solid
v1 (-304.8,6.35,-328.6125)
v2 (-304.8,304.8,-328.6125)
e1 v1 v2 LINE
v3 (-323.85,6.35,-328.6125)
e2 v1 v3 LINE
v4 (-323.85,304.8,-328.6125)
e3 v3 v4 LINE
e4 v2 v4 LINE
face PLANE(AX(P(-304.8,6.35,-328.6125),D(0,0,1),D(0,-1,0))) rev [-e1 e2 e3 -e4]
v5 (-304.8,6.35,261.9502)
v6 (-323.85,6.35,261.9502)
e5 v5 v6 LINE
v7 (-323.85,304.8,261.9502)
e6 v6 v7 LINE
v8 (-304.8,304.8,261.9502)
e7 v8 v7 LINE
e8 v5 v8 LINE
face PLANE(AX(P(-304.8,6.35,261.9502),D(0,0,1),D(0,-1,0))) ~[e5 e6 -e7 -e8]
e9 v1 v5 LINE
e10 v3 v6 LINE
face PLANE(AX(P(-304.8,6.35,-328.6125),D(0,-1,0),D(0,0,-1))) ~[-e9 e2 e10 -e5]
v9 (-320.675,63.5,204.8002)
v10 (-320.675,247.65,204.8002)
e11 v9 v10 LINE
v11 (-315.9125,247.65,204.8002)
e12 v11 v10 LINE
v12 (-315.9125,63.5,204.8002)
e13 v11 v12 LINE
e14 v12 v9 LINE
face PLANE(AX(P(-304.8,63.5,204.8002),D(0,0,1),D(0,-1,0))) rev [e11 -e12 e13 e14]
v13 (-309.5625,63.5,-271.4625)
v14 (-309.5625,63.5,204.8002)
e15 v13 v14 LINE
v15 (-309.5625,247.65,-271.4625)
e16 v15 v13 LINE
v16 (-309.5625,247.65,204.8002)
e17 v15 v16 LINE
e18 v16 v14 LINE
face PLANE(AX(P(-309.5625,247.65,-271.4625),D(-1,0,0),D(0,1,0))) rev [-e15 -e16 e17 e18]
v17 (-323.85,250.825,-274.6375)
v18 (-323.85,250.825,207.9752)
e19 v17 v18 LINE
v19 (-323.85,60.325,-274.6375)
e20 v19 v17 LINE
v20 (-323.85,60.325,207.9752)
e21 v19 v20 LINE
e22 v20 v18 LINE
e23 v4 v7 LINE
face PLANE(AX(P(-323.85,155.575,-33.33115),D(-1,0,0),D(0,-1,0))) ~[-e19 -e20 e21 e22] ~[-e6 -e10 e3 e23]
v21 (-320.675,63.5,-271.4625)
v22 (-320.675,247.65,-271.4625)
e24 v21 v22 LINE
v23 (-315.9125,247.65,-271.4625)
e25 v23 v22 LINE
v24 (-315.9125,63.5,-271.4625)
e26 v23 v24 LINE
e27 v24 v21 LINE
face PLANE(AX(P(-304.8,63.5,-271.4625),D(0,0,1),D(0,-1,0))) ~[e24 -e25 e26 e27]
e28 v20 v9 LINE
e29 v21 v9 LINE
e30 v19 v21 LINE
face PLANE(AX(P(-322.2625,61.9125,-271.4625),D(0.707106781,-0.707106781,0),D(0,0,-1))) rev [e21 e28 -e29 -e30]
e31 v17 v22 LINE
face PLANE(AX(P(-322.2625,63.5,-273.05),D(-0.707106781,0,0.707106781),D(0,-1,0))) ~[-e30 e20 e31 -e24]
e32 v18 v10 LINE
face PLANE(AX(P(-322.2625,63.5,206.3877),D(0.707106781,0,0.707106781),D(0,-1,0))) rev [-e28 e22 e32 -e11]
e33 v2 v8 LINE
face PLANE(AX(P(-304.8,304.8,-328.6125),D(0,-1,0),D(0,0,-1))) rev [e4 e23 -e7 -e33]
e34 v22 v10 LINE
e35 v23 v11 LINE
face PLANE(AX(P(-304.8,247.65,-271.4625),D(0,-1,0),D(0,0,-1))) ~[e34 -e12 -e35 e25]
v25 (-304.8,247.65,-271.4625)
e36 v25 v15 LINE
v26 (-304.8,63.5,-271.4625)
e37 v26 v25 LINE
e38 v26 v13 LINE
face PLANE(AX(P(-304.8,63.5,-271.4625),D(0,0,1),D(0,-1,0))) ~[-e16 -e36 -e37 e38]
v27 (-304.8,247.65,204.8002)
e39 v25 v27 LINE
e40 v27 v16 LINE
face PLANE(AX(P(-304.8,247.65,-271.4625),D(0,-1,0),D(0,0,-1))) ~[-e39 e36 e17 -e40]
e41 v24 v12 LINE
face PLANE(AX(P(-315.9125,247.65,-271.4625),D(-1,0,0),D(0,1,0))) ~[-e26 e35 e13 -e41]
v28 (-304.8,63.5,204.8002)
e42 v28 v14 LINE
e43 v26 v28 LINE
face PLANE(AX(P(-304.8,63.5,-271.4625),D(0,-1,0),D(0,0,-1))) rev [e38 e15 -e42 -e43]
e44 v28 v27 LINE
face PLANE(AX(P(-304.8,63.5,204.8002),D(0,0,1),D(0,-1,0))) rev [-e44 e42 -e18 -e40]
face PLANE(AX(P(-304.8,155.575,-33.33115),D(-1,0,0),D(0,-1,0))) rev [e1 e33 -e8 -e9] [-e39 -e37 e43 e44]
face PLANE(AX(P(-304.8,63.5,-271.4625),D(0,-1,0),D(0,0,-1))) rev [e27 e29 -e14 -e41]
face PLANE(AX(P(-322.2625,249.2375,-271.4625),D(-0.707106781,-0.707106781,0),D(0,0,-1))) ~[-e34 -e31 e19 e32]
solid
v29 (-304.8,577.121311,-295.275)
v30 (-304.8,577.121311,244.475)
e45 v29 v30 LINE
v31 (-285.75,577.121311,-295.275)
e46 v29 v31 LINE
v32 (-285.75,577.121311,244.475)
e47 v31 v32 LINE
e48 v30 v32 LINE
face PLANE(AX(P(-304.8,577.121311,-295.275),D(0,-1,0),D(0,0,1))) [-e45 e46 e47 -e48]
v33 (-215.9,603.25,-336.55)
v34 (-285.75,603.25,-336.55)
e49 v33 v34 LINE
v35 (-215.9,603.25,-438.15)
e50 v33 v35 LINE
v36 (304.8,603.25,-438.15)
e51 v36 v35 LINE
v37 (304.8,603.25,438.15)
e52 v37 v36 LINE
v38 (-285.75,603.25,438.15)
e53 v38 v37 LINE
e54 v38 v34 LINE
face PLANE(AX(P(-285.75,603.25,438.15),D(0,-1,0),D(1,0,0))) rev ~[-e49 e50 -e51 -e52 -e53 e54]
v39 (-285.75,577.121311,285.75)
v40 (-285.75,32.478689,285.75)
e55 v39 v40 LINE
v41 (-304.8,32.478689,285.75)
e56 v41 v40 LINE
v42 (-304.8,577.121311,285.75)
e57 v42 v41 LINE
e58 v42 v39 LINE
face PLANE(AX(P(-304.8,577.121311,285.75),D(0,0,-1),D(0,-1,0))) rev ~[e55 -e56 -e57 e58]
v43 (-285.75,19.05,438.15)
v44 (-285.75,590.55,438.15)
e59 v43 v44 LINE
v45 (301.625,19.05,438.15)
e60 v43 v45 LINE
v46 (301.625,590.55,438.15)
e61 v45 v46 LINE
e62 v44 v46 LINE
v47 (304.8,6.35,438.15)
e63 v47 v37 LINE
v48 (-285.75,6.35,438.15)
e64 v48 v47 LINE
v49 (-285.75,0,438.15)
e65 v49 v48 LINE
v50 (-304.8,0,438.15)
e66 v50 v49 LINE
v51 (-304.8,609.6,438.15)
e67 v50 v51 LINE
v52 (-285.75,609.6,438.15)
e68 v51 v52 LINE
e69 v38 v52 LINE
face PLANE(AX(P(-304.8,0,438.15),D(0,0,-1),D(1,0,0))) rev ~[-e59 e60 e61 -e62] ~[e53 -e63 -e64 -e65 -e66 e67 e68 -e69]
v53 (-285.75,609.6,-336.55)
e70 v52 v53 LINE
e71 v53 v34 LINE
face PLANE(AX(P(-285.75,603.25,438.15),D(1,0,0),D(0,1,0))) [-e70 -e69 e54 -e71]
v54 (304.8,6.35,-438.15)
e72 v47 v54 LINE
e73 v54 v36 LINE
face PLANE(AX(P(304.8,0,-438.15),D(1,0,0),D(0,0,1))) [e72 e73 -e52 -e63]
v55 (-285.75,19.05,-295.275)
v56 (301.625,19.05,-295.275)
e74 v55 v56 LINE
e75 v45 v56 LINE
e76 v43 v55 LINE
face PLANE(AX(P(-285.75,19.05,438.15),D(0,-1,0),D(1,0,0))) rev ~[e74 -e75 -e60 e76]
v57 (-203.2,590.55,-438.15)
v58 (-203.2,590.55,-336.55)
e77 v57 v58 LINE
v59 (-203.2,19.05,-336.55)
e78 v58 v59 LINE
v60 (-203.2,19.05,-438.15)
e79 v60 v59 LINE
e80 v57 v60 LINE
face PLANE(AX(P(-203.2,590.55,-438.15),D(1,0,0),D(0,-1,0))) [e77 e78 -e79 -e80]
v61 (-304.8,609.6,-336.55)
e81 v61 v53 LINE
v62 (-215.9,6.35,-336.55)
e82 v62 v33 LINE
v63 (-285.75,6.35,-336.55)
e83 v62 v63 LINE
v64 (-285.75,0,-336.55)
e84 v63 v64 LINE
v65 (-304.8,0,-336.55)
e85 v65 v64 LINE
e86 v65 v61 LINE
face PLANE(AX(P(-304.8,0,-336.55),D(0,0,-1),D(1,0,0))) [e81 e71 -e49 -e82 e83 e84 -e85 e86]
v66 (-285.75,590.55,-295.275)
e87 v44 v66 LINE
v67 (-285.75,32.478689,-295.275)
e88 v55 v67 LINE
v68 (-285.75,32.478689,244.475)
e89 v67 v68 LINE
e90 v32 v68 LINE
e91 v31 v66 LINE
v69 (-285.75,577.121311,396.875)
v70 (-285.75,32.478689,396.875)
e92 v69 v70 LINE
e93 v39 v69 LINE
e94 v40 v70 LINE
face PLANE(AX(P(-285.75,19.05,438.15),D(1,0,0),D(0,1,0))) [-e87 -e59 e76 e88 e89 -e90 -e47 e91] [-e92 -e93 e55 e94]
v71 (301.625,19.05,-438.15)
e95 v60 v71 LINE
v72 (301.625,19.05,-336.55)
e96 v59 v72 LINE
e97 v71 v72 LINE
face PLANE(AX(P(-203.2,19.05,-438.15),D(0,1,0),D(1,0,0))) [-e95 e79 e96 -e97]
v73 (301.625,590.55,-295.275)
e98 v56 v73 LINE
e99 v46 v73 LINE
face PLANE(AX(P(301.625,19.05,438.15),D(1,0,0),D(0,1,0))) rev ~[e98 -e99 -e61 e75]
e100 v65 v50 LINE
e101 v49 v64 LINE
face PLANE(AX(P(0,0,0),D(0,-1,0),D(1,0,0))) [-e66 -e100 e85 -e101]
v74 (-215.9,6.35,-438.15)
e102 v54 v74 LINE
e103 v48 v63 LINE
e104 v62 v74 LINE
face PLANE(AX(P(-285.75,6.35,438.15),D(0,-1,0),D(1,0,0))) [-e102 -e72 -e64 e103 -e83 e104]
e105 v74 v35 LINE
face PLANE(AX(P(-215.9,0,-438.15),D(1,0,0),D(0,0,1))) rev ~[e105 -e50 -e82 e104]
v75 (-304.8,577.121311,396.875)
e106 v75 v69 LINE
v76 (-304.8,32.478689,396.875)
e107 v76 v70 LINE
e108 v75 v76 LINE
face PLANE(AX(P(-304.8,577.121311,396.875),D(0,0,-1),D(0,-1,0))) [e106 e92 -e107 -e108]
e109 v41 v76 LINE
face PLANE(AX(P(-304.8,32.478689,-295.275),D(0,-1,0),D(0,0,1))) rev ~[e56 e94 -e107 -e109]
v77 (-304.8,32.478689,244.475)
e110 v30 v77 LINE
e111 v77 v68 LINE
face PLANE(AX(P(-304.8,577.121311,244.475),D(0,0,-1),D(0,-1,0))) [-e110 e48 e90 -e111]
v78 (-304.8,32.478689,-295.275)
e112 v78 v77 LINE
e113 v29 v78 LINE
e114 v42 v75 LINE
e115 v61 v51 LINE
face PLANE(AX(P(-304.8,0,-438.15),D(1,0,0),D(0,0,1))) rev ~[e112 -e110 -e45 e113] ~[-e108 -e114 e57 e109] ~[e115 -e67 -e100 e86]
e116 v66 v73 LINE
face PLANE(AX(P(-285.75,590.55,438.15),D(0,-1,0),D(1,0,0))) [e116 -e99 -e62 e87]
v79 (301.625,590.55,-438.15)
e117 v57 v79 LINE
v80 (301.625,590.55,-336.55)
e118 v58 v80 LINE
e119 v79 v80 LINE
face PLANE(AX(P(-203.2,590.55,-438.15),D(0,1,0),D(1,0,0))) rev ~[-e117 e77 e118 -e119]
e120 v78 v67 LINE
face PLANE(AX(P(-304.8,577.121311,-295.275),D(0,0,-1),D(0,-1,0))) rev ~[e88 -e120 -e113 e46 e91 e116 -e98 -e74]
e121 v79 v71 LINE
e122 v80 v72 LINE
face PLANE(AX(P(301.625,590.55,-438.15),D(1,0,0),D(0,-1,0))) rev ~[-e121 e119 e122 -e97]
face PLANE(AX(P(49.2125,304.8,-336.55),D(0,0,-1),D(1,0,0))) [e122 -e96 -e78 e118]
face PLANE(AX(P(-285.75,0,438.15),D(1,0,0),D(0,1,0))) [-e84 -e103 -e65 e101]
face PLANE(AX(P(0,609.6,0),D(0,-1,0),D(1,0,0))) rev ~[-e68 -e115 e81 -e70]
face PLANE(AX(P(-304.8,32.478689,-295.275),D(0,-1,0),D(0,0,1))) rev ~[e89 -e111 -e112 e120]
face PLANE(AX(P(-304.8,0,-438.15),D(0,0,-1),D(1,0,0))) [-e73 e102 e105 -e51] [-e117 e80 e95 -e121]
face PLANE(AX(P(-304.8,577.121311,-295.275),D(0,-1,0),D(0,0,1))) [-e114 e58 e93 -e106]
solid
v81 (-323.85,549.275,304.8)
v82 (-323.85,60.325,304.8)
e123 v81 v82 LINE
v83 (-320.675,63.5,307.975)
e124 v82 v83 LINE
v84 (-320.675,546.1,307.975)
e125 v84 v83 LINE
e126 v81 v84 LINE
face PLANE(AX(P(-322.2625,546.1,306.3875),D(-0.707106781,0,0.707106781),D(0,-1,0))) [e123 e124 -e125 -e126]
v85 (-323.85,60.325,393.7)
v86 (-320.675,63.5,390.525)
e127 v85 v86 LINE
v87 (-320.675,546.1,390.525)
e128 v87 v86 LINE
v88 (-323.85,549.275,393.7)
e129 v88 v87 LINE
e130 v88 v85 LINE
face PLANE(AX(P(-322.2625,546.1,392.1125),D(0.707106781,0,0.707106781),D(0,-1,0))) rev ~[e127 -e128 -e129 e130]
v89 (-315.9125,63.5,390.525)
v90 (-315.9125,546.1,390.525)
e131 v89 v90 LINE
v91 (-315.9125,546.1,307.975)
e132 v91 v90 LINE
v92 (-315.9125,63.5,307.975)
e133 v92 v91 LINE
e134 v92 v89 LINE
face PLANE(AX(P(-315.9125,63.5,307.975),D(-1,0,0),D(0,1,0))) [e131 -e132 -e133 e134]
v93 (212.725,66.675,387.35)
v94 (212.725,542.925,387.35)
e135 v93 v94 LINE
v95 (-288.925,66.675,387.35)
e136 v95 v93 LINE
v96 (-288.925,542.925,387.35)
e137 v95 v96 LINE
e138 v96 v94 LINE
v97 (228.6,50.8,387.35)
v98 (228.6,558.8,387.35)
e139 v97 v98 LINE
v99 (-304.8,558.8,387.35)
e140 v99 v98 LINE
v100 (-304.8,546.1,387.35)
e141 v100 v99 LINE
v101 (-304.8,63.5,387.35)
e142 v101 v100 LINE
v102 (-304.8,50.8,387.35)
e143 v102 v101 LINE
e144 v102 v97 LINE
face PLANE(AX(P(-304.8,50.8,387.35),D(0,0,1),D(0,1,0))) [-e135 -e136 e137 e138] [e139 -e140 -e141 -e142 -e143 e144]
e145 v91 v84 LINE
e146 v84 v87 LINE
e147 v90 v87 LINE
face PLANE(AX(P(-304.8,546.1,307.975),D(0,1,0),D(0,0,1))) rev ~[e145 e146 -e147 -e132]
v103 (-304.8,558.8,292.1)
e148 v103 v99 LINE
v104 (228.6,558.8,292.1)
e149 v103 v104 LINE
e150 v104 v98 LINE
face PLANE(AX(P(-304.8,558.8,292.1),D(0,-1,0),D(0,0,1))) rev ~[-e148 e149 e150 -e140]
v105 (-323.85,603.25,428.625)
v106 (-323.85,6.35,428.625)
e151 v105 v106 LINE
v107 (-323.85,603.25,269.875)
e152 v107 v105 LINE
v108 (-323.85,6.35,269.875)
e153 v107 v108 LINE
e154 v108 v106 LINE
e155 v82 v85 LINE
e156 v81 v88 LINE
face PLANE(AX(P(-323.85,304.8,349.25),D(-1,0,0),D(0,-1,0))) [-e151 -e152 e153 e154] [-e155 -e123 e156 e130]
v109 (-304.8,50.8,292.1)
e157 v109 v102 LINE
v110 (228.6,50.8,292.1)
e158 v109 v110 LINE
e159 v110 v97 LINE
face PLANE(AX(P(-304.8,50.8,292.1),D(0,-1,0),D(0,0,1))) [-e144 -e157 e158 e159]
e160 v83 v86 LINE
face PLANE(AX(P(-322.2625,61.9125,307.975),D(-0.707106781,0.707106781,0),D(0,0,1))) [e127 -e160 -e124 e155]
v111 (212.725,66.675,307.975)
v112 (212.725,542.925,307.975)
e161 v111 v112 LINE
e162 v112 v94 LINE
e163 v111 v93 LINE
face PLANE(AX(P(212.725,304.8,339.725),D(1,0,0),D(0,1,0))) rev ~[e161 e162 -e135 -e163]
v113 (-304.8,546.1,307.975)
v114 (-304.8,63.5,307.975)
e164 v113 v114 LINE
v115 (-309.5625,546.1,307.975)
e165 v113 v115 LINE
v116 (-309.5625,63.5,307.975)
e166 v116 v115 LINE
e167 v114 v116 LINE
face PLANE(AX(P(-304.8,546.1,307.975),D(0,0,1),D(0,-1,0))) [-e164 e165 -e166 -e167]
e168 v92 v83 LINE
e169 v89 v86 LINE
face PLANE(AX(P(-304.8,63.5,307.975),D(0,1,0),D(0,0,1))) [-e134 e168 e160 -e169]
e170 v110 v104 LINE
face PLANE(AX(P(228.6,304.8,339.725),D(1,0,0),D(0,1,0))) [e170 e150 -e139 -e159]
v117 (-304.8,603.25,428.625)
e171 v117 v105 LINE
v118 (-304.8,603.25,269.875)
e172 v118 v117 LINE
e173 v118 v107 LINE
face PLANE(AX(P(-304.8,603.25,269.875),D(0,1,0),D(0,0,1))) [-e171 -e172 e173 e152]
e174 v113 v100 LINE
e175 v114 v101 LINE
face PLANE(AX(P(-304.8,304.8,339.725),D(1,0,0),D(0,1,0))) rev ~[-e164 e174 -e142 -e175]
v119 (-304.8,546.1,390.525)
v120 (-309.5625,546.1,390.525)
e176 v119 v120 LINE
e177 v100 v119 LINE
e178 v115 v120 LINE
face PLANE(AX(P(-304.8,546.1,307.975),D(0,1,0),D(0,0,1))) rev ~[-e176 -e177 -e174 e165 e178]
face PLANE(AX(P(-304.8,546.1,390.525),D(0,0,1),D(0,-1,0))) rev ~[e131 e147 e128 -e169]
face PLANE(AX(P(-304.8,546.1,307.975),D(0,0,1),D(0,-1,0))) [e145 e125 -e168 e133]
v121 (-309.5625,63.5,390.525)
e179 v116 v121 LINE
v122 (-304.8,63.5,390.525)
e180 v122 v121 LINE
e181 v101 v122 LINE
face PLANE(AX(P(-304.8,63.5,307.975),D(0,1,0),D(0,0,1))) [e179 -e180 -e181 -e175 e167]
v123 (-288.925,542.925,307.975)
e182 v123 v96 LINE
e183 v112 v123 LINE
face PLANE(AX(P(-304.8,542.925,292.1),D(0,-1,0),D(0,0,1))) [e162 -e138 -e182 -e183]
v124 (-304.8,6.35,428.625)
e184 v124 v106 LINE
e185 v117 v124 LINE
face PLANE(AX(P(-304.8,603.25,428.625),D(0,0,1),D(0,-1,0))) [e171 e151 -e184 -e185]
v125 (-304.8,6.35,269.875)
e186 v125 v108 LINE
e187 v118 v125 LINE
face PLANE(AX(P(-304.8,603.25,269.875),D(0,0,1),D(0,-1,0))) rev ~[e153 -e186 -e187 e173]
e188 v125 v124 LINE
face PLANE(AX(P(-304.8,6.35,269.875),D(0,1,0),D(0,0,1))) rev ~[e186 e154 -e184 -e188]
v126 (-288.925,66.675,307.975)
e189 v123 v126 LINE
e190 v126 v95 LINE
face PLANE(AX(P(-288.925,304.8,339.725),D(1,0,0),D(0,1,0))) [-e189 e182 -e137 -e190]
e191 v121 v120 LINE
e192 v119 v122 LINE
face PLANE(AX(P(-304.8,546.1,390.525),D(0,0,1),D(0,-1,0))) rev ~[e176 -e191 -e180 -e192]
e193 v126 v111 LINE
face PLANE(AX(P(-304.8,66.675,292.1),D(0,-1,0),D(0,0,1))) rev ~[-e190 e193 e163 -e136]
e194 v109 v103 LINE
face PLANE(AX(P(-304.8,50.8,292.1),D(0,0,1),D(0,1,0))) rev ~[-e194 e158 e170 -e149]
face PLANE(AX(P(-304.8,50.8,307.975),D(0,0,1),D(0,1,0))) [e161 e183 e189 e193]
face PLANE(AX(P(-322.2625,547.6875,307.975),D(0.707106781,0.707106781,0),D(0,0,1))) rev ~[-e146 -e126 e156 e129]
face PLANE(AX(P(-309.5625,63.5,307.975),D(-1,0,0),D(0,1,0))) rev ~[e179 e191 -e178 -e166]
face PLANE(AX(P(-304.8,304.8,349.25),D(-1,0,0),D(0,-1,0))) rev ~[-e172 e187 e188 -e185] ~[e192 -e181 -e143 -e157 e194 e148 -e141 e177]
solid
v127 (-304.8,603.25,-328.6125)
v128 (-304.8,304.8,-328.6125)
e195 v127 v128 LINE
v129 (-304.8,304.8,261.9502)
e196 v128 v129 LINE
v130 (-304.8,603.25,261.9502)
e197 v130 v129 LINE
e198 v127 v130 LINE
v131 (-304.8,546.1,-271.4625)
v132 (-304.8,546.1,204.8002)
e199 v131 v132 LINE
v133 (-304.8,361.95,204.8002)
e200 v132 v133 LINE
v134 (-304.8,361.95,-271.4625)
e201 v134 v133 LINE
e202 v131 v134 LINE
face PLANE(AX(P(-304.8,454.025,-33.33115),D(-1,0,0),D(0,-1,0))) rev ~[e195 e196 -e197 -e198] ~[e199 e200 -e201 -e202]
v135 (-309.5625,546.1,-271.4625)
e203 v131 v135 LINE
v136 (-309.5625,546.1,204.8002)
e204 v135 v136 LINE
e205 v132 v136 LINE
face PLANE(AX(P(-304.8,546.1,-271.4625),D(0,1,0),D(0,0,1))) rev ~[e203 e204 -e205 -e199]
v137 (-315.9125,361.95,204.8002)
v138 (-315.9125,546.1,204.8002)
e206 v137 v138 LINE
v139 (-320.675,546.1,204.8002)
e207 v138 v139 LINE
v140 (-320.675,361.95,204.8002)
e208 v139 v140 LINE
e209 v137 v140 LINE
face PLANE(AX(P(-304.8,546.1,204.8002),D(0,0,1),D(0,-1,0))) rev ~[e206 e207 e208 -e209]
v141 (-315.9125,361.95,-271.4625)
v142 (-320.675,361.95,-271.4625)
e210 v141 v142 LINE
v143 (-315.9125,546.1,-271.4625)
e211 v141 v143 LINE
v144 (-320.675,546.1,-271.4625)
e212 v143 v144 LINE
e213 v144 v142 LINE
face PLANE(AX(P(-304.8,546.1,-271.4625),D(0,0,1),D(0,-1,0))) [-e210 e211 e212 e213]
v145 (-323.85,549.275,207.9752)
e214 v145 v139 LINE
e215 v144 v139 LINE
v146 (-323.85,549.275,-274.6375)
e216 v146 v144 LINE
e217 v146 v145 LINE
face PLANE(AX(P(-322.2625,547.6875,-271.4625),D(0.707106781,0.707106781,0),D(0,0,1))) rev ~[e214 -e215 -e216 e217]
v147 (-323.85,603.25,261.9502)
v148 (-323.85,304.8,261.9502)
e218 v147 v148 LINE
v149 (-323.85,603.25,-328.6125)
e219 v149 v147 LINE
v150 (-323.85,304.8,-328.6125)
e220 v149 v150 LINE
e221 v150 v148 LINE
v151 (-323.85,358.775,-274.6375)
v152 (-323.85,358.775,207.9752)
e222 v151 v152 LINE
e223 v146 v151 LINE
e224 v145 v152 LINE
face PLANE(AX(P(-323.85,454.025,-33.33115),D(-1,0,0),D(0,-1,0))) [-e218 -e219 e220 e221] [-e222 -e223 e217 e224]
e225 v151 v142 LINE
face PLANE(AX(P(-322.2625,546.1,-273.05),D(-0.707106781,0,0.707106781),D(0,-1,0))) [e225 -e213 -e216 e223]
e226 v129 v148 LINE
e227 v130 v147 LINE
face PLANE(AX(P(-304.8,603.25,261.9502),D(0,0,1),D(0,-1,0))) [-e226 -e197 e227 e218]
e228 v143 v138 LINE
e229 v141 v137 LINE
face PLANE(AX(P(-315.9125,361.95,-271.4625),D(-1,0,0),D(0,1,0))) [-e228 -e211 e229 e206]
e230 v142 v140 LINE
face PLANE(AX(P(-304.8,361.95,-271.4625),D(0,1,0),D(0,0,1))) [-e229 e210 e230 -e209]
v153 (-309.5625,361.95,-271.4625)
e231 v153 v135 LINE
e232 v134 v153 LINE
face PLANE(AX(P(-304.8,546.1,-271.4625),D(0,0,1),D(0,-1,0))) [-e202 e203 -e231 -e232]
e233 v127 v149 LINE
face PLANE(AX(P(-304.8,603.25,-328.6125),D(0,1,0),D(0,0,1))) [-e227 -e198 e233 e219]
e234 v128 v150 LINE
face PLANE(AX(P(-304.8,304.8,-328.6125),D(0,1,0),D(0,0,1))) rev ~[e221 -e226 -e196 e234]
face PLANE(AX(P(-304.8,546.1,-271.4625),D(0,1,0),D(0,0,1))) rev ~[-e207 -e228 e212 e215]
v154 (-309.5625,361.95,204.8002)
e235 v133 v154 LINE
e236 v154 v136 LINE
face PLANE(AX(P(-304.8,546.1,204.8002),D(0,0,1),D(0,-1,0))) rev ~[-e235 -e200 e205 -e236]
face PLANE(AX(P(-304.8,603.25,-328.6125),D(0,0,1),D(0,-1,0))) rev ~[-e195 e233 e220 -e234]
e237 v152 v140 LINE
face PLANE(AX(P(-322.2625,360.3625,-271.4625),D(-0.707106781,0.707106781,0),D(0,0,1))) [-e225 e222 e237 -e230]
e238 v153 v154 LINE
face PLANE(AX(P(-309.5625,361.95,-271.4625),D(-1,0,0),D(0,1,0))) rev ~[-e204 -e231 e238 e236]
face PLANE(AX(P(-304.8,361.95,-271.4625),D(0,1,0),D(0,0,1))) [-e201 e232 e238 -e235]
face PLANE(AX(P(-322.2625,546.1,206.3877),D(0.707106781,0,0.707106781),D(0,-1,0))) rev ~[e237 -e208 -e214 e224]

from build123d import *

# Parameters (mm, degrees)
F0_W          = 609.6
F0_H          = 876.3
F1_DEPTH      = 609.6
F2_W          = 88.9
F2_H          = 101.6
F3_DEPTH      = 609.601
F4_W          = 544.6426229508
F4_H          = 692.15
F5_DEPTH      = 19.05
F6_W          = 590.55
F6_H          = 6.35
F7_DEPTH      = 876.301
F8_W          = 587.375
F8_H          = 571.5
F9_DEPTH      = 733.425
F10_W         = 544.6426229508
F10_H         = 41.275
F11_DEPTH     = 19.05
F12_W         = 298.45
F12_H         = 590.5627
F12_W_2       = 184.15
F12_H_2       = 476.2627
F13_DEPTH     = 19.05
F14_W         = 6.35
F14_H         = 184.15
F15_DEPTH     = 476.2627
F16_SIZE      = 3.175
F17_W         = 596.9
F17_H         = 158.75
F17_W_2       = 482.6
F17_H_2       = 82.55
F18_DEPTH     = 19.05
F19_W         = 6.35
F19_H         = 482.6
F20_DEPTH     = 82.55
F21_SIZE      = 3.175
F22_W         = 504.825
F22_H         = 571.5
F23_DEPTH     = 101.6
F24_W         = 508
F24_H         = 95.25
F25_DEPTH     = 533.4
F26_T         = 15.875
F26_T3_DEPTH  = 37.249261314
F26_T5_DEPTH  = 37.249261314
F26_T7_DEPTH  = 37.249261314
F26_T9_DEPTH  = 37.249261314
F26_T11_DEPTH = 36.5125
F26_T13_DEPTH = 514.35
F26_T15_DEPTH = 114.3
F26_T17_DEPTH = 127
F26_T19_DEPTH = 539.75
F26_T21_DEPTH = 111.125
F26_T23_DEPTH = 36.5125


# Not quite as in the source:
# - a shell that OpenCascade refuses in one call is made with other operations: the cavity is built on its own and cut out


with BuildPart() as f1:
    # F0 (on Front) → F1 (new body)
    with BuildSketch(Plane.XZ):
        Rectangle(F0_W, F0_H)
    extrude(amount=-F1_DEPTH)

    # F2 (on face) → F3 (cut, through all)
    with BuildSketch(Plane.XZ):
        with Locations((-260.35, -387.35)):
            Rectangle(F2_W, F2_H)
    extrude(amount=-F3_DEPTH, mode=Mode.SUBTRACT)

    # F4 (on face) → F5 (cut)
    with BuildSketch(Plane(origin=(-304.8, 0, 0), x_dir=(0, -1, 0), z_dir=(-1, 0, 0))):
        with Locations((-304.8, 50.8)):
            Rectangle(F4_W, F4_H)
    extrude(amount=-F5_DEPTH, mode=Mode.SUBTRACT)

    # F6 (on face) → F7 (cut, through all)
    with BuildSketch(Plane.XY.offset(438.15)):
        with Locations((9.525, 606.425)):
            Rectangle(F6_W, F6_H)
        with Locations((9.525, 3.175)):
            Rectangle(F6_W, F6_H)
    extrude(amount=-F7_DEPTH, mode=Mode.SUBTRACT)

    # F8 (on face) → F9 (cut, through all)
    with BuildSketch(Plane.XY.offset(438.15)):
        with Locations((7.9375, 304.8)):
            Rectangle(F8_W, F8_H)
    extrude(amount=-F9_DEPTH, mode=Mode.SUBTRACT)

    # F10 (on face) → F11 (join, through all)
    with BuildSketch(Plane(origin=(-304.8, 0, 0), x_dir=(0, -1, 0), z_dir=(-1, 0, 0))):
        with Locations((-304.8, 265.1125)):
            Rectangle(F10_W, F10_H)
    extrude(amount=-F11_DEPTH)

    # F22 (on face) → F23 (cut)
    with BuildSketch(Plane(origin=(0, 0, -438.15), x_dir=(1, 0, 0), z_dir=(0, 0, -1))):
        with Locations((49.2125, -304.8)):
            Rectangle(F22_W, F22_H)
    extrude(amount=-F23_DEPTH, mode=Mode.SUBTRACT)


with BuildPart() as f13:
    # F12 (on face) → F13 (new body)
    with BuildSketch(Plane(origin=(-304.8, 0, 0), x_dir=(0, -1, 0), z_dir=(-1, 0, 0))):
        with Locations((-454.025, -33.33115)):
            Rectangle(F12_W, F12_H)
        with Locations((-454.025, -33.33115)):
            Rectangle(F12_W_2, F12_H_2, mode=Mode.SUBTRACT)
    extrude(amount=F13_DEPTH)

    # F14 (on face) → F15 (join, through all)
    with BuildSketch(Plane.XY.offset(-271.4625)):
        with Locations((-312.7375, 454.025)):
            Rectangle(F14_W, F14_H)
    extrude(amount=F15_DEPTH)

    # F16
    f16_edges = [f13.edges().sort_by_distance(p)[0] for p in [
        (-323.85, 546.1, -33.33115),
        (-323.85, 454.025, -271.4625),
        (-323.85, 361.95, -33.33115),
        (-323.85, 454.025, 204.8002),
    ]]
    chamfer(f16_edges, length=F16_SIZE)


with BuildPart() as f18:
    # F17 (on face) → F18 (new body)
    with BuildSketch(Plane(origin=(-304.8, 0, 0), x_dir=(0, -1, 0), z_dir=(-1, 0, 0))):
        with Locations((-304.8, 349.25)):
            Rectangle(F17_W, F17_H)
        with Locations((-304.8, 349.25)):
            Rectangle(F17_W_2, F17_H_2, mode=Mode.SUBTRACT)
    extrude(amount=F18_DEPTH)

    # F19 (on face) → F20 (join, through all)
    with BuildSketch(Plane.XY.offset(307.975)):
        with Locations((-312.7375, 304.8)):
            Rectangle(F19_W, F19_H)
    extrude(amount=F20_DEPTH)

    # F21
    f21_edges = [f18.edges().sort_by_distance(p)[0] for p in [
        (-323.85, 304.8, 307.975),
        (-323.85, 546.1, 349.25),
        (-323.85, 304.8, 390.525),
        (-323.85, 63.5, 349.25),
    ]]
    chamfer(f21_edges, length=F21_SIZE)

    # F24 (on face) → F25 (join)
    with BuildSketch(Plane.YZ.offset(-304.8)):
        with Locations((304.8, 339.725)):
            Rectangle(F24_W, F24_H)
    extrude(amount=F25_DEPTH)

    # F26: shell of thickness 15.875, made by hand


with BuildPart() as f26_core1:
    # F26_t2: copy of F18
    add(f18.part)

    # the walls: a layer under each face that stays
    f26_faces = [f26_core1.faces().sort_by_distance(p)[0] for p in [
        (-323.85, 503.7666666667, 296.3333333333),
        (-322.2625, 304.8, 306.3875),
        (-322.2625, 61.9125, 349.25),
        (-322.2625, 547.6875, 349.25),
        (-322.2625, 304.8, 392.1125),
        (-314.325, 304.8, 428.625),
        (-314.325, 603.25, 349.25),
        (-314.325, 304.8, 269.875),
        (-314.325, 6.35, 349.25),
        (-318.29375, 304.8, 307.975),
        (-318.29375, 63.5, 349.25),
        (-318.29375, 546.1, 349.25),
        (-318.29375, 304.8, 390.525),
        (-304.8, 503.7666666667, 402.1666666667),
        (-315.9125, 304.8, 349.25),
        (-38.1, 558.8, 339.725),
        (-38.1, 304.8, 292.1),
        (-38.1, 50.8, 339.725),
        (-307.18125, 63.5, 349.25),
        (-307.18125, 304.8, 390.525),
        (-307.18125, 546.1, 349.25),
        (-304.8, 304.8, 347.6625),
        (228.6, 304.8, 339.725),
        (-307.18125, 304.8, 307.975),
        (-309.5625, 304.8, 349.25),
    ]]
    thicken(f26_faces, amount=-F26_T, mode=Mode.SUBTRACT)

    # F26_s4 → F26_t3 (cut)
    with BuildSketch(Plane(origin=(4.5928978099, 4.5928978099, 4.5928978099), x_dir=(-0.7071067812, 0.7071067812, 0), z_dir=(0.5773502692, 0.5773502692, 0.5773502692))):
        Polygon((271.8908726623, 356.5892701441), (263.7152476623, 342.7036353262), (255.7777476623, 347.2863530879), (255.7777476623, 356.4517886113), align=None)
    extrude(amount=F26_T3_DEPTH, mode=Mode.SUBTRACT)

    # F26_s6 → F26_t5 (cut)
    with BuildSketch(Plane(origin=(-198.6071021901, 198.60710219, -198.6071021901), x_dir=(0.7071067812, 0.7071067812, 0), z_dir=(0.5773502692, -0.5773502692, 0.5773502692))):
        Polygon((159.161421149, 605.4574280109), (167.337046149, 591.571793193), (175.274546149, 596.1545109546), (175.274546149, 605.319946478), align=None)
    extrude(amount=F26_T5_DEPTH, mode=Mode.SUBTRACT)

    # F26_s8 → F26_t7 (cut)
    with BuildSketch(Plane(origin=(-228.2404355234, -228.2404355234, 228.2404355234), x_dir=(-0.7071067812, 0.7071067812, 0), z_dir=(0.5773502692, 0.5773502692, -0.5773502692))):
        Polygon((271.8908726623, 213.7335916339), (255.7777476623, 213.8710731668), (255.7777476623, 223.0365086901), (263.7152476623, 227.6192264518), align=None)
    extrude(amount=F26_T7_DEPTH, mode=Mode.SUBTRACT)

    # F26_s10 → F26_t9 (cut)
    with BuildSketch(Plane(origin=(-431.4404355234, 431.4404355234, 431.4404355234), x_dir=(0.7071067812, 0.7071067812, 0), z_dir=(0.5773502692, -0.5773502692, -0.5773502692))):
        Polygon((159.161421149, -35.1345662329), (175.274546149, -34.9970847), (175.274546149, -25.8316491766), (167.337046149, -21.2489314149), align=None)
    extrude(amount=F26_T9_DEPTH, mode=Mode.SUBTRACT)

    # F26_s12 → F26_t11 (cut)
    with BuildSketch(Plane.YZ.offset(-336.55)):
        Polygon((545.94125, 308.13375), (546.1, 292.1), (561.975, 292.1), (561.975, 307.975), align=None)
        Polygon((63.65875, 308.13375), (63.5, 292.1), (47.625, 292.1), (47.625, 307.975), align=None)
        Polygon((63.65875, 390.36625), (47.625, 390.525), (47.625, 406.4), (63.5, 406.4), align=None)
        Polygon((545.94125, 390.36625), (561.975, 390.525), (561.975, 406.4), (546.1, 406.4), align=None)
    extrude(amount=F26_T11_DEPTH, mode=Mode.SUBTRACT)

    # F26_s14 → F26_t13 (cut)
    with BuildSketch(Plane.XZ.offset(-561.975)):
        Polygon((-316.07125, 308.13375), (-315.9125, 292.1), (-300.0375, 292.1), (-300.0375, 307.975), align=None)
        Polygon((-316.07125, 390.36625), (-315.9125, 406.4), (-300.0375, 406.4), (-300.0375, 390.525), align=None)
        Polygon((-309.40375, 390.36625), (-309.5625, 406.4), (-325.4375, 406.4), (-325.4375, 390.525), align=None)
        Polygon((-304.95875, 308.13375), (-288.925, 307.975), (-288.925, 292.1), (-304.8, 292.1), align=None)
        Polygon((-309.40375, 308.13375), (-309.5625, 292.1), (-325.4375, 292.1), (-325.4375, 307.975), align=None)
    extrude(amount=F26_T13_DEPTH, mode=Mode.SUBTRACT)

    # F26_s16 → F26_t15 (cut)
    with BuildSketch(Plane.XY.offset(292.1)):
        Polygon((-316.07125, 63.65875), (-315.9125, 47.625), (-300.0375, 47.625), (-300.0375, 63.5), align=None)
        Polygon((-316.07125, 545.94125), (-315.9125, 561.975), (-300.0375, 561.975), (-300.0375, 546.1), align=None)
        Polygon((-309.40375, 63.65875), (-309.5625, 47.625), (-325.4375, 47.625), (-325.4375, 63.5), align=None)
        Polygon((-309.40375, 545.94125), (-309.5625, 561.975), (-325.4375, 561.975), (-325.4375, 546.1), align=None)
    extrude(amount=F26_T15_DEPTH, mode=Mode.SUBTRACT)

    # F26_s18 → F26_t17 (cut)
    with BuildSketch(Plane.XY.offset(276.225)):
        Polygon((-304.64125, 558.95875), (-320.675, 558.8), (-320.675, 542.925), (-304.8, 542.925), align=None)
        Polygon((-304.64125, 50.64125), (-320.675, 50.8), (-320.675, 66.675), (-304.8, 66.675), align=None)
    extrude(amount=F26_T17_DEPTH, mode=Mode.SUBTRACT)

    # F26_s20 → F26_t19 (cut)
    with BuildSketch(Plane.XZ.offset(-574.675)):
        Polygon((-304.64125, 291.94125), (-320.675, 292.1), (-320.675, 307.975), (-304.8, 307.975), align=None)
    extrude(amount=F26_T19_DEPTH, mode=Mode.SUBTRACT)

    # F26_s22 → F26_t21 (cut)
    with BuildSketch(Plane.XY.offset(292.1)):
        Polygon((-304.95875, 63.65875), (-304.8, 47.625), (-288.925, 47.625), (-288.925, 63.5), align=None)
        Polygon((-304.95875, 545.94125), (-304.8, 561.975), (-288.925, 561.975), (-288.925, 546.1), align=None)
    extrude(amount=F26_T21_DEPTH, mode=Mode.SUBTRACT)

    # F26_s24 → F26_t23 (cut)
    with BuildSketch(Plane.YZ.offset(-325.4375)):
        Polygon((63.65875, 308.13375), (47.625, 307.975), (47.625, 292.1), (63.5, 292.1), align=None)
        Polygon((63.65875, 390.36625), (47.625, 390.525), (47.625, 406.4), (63.5, 406.4), align=None)
        Polygon((545.94125, 390.36625), (546.1, 406.4), (561.975, 406.4), (561.975, 390.525), align=None)
        Polygon((545.94125, 308.13375), (561.975, 307.975), (561.975, 292.1), (546.1, 292.1), align=None)
    extrude(amount=F26_T23_DEPTH, mode=Mode.SUBTRACT)


with BuildPart() as f18_1:
    add(f18.part)

    # what is left inside the walls is the cavity
    f26_cavity = [f26_core1.part.solids().sort_by_distance(p)[0] for p in [
        (45.508333, 304.8, 308.13375),
    ]]
    add(f26_cavity, mode=Mode.SUBTRACT)


with BuildPart() as f27_1:
    # F27: instance of F13
    add(f13.part.mirror(Plane(origin=(-314.325, 304.8, -33.33115), x_dir=(1, 0, 0), z_dir=(0, -1, 0))))


solid = Compound([f1.part, f13.part, f18_1.part, f27_1.part])
